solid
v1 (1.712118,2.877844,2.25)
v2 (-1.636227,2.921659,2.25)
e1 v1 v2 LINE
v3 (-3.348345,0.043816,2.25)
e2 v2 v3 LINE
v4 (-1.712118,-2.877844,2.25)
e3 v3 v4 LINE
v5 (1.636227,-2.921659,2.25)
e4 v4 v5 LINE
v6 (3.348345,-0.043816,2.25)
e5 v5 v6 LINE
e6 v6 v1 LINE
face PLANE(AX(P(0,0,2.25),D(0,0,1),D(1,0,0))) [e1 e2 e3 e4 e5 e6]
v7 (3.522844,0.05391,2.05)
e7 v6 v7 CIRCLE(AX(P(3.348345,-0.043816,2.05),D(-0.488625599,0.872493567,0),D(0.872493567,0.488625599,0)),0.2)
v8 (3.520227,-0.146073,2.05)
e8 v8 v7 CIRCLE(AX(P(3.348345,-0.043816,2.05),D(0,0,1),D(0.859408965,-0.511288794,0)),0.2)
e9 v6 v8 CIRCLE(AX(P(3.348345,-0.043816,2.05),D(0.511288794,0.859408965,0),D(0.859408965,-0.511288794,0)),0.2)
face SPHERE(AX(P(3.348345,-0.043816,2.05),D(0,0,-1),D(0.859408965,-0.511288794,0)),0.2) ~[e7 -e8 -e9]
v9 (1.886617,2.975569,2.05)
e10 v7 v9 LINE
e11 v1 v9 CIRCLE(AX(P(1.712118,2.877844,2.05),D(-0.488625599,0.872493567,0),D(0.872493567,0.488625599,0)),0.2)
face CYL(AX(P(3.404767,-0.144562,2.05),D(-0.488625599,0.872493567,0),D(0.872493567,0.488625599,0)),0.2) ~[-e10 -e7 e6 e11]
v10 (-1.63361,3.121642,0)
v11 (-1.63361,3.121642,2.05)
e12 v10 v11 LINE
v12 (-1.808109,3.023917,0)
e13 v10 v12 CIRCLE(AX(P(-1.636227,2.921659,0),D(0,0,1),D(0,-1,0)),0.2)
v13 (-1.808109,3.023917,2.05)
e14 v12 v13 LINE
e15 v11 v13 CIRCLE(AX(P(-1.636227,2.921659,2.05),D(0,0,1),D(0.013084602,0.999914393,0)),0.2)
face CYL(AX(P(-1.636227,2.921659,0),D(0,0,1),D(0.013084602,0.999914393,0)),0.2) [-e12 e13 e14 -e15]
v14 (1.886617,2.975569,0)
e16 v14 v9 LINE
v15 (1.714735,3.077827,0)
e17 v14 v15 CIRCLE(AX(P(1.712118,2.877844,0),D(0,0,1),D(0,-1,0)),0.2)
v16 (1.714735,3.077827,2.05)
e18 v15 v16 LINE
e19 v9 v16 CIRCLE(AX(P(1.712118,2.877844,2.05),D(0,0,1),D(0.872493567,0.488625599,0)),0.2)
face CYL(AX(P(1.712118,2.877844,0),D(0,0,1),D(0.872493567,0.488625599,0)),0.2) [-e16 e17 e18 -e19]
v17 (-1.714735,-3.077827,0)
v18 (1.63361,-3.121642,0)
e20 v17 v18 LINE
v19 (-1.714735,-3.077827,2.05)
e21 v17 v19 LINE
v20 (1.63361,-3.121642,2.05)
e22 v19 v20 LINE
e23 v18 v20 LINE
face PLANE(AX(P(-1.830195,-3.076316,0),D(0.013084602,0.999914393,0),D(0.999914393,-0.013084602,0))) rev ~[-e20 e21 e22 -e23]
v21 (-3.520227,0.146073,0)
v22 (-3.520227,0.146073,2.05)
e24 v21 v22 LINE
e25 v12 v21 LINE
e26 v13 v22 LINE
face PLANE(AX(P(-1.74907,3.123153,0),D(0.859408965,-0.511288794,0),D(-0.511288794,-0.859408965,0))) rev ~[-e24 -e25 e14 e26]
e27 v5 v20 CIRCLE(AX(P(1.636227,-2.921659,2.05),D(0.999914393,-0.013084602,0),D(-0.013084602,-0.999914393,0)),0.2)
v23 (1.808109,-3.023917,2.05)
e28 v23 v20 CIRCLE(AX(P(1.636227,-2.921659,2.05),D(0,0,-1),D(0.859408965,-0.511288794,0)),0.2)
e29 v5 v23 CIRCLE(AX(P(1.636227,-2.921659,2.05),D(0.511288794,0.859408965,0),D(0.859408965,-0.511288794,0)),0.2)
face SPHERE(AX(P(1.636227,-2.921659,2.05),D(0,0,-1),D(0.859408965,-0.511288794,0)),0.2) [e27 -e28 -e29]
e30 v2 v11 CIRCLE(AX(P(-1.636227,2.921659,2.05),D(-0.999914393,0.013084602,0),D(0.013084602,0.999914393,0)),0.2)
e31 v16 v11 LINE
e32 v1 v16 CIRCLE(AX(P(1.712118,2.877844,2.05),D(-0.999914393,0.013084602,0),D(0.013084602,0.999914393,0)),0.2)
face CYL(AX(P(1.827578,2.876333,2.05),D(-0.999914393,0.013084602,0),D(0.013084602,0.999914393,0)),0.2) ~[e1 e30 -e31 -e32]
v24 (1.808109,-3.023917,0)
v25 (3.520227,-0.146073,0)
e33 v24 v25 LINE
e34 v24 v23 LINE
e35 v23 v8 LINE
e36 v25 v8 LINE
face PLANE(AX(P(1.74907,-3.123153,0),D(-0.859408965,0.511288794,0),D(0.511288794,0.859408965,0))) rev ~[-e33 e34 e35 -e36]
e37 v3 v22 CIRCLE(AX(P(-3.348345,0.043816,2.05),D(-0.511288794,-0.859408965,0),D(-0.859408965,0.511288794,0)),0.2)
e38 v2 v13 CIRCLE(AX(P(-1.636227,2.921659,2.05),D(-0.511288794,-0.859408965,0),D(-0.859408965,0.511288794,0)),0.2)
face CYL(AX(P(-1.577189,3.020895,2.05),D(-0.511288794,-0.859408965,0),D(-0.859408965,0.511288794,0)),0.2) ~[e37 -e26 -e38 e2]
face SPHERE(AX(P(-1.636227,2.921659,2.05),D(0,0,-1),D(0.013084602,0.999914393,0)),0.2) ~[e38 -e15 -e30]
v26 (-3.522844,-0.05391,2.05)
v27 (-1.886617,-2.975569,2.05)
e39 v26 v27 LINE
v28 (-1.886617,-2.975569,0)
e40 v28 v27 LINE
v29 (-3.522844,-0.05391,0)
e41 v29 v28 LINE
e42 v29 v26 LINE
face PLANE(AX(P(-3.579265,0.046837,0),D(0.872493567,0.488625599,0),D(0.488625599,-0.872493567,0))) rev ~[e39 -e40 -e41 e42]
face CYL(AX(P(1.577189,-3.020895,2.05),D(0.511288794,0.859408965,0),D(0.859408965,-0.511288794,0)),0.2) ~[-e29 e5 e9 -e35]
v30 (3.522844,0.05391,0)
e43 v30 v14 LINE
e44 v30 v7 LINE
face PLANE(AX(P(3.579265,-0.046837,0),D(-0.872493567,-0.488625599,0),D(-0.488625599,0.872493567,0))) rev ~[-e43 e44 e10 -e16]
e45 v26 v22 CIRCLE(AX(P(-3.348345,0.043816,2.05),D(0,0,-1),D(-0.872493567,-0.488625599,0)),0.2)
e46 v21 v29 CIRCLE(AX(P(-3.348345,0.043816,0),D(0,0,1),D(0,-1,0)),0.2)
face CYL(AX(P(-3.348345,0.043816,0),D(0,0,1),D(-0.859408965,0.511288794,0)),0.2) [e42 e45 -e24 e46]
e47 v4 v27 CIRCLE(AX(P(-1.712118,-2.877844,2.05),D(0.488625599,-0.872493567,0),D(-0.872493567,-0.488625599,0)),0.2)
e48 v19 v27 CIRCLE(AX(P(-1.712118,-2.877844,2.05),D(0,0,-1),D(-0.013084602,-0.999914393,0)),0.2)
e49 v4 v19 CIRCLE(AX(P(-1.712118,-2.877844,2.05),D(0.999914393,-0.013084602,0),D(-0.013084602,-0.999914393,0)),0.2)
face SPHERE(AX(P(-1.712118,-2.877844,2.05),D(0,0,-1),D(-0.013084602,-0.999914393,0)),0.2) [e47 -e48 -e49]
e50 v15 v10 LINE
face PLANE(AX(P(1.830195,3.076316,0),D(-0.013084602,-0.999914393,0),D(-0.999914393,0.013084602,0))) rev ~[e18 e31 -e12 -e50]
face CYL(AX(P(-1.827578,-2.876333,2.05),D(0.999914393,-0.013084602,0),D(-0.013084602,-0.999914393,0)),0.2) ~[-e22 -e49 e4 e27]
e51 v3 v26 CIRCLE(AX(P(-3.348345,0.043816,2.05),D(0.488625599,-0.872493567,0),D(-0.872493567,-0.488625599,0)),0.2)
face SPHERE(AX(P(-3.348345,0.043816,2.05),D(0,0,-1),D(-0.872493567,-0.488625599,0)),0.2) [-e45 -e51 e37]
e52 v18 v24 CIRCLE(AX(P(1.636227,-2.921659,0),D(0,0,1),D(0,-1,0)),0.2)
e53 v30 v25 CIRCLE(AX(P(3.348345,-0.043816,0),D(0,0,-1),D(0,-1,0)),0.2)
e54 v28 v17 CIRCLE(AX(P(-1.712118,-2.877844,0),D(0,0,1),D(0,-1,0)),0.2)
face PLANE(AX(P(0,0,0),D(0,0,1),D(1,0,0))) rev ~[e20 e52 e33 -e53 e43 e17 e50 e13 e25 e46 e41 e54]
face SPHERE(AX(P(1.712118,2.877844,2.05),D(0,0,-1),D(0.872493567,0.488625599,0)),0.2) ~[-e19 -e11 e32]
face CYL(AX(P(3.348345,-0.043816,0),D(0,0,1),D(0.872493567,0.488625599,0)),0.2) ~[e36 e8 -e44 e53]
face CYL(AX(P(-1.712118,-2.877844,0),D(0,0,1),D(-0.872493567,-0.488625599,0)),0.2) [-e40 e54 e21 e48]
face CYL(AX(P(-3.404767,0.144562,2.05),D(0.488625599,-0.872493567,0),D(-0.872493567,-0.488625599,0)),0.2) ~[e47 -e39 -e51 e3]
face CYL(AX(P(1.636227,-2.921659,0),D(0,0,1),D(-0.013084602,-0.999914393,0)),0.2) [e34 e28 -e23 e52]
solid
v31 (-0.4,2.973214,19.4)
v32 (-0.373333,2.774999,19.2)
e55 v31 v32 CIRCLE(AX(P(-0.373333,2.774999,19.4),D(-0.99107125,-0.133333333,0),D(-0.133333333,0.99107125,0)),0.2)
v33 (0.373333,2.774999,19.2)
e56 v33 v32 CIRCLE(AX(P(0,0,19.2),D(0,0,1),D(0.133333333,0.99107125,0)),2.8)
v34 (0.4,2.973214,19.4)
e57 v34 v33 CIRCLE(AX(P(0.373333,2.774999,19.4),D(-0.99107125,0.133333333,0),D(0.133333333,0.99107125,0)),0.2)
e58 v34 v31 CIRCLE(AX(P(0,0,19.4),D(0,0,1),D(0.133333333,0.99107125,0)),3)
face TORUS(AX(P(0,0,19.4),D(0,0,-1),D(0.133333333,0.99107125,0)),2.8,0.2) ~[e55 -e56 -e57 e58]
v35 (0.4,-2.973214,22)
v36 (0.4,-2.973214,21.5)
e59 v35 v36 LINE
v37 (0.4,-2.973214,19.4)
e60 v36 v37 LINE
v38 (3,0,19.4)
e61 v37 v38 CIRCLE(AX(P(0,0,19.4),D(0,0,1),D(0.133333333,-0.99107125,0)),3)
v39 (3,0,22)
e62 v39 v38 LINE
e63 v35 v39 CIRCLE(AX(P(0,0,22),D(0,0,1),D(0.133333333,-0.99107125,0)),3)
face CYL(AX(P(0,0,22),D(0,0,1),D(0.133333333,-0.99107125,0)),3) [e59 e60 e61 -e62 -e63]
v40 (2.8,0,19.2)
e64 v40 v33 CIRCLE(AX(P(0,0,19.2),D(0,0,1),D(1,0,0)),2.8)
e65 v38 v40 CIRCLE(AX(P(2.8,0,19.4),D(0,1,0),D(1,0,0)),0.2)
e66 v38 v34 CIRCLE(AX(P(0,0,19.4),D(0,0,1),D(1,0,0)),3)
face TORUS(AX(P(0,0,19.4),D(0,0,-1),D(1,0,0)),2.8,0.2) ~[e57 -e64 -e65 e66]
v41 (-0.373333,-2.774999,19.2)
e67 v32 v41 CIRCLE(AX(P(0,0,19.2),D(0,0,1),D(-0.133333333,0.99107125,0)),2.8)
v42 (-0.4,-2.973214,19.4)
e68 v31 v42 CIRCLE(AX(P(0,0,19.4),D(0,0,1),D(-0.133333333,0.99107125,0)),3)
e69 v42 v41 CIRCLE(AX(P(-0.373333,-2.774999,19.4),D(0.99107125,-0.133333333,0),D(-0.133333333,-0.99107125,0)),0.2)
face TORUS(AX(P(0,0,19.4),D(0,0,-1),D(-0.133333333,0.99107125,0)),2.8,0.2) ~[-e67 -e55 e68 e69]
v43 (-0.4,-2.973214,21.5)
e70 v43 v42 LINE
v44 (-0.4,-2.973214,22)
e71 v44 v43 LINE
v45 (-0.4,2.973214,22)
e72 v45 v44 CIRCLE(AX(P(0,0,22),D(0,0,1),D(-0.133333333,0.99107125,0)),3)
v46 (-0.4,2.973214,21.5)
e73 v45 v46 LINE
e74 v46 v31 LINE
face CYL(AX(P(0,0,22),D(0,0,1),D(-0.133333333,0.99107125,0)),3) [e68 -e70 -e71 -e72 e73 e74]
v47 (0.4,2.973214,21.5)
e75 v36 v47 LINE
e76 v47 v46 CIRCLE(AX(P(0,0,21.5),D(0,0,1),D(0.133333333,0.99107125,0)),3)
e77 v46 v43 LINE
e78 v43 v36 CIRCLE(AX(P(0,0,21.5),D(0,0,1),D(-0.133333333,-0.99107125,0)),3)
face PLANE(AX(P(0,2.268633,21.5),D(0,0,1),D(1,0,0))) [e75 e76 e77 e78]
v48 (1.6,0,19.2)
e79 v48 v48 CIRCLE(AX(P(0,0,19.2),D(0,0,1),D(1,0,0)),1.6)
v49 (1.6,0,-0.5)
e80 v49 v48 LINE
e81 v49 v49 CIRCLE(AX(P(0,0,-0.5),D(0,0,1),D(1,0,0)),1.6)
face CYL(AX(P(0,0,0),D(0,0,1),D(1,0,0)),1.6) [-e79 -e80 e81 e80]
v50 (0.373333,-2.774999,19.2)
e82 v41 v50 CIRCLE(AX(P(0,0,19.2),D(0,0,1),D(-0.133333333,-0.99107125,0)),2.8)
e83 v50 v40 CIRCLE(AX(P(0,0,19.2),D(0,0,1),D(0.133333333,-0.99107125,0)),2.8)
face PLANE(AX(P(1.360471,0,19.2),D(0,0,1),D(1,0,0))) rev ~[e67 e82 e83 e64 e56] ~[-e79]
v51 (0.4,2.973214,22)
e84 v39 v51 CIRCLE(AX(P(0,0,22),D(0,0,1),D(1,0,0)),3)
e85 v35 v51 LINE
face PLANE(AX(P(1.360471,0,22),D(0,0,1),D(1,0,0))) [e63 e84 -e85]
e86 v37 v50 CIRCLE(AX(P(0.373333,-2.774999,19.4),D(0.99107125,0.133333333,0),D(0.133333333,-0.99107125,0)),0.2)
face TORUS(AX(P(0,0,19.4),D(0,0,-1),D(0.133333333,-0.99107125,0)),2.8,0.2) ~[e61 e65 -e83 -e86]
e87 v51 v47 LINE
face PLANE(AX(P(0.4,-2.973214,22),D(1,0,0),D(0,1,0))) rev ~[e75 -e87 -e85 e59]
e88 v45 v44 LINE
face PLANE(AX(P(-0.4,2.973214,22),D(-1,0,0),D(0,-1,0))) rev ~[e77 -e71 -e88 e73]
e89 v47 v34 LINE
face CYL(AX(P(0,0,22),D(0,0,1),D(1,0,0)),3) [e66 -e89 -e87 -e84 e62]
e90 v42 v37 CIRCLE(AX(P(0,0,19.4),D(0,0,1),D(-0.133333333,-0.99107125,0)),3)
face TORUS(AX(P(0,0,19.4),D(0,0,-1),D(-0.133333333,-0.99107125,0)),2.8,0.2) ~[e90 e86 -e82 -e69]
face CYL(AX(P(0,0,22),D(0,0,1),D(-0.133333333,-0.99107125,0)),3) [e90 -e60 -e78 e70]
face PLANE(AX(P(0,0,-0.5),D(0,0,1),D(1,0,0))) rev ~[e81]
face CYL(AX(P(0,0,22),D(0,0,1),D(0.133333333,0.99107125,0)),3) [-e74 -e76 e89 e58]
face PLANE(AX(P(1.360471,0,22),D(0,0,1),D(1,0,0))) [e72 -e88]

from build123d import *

# Parameters (mm, degrees)
F1_DEPTH      = 2.25
F2_R          = 1.6
F3_DEPTH      = 22
F3_DEPTH_BACK = 0.5
F5_DEPTH      = 2.8
F6_R          = 0.2
F6_2_R        = 0.2
F7_DEPTH      = 0.5


# Not quite as in the source:
# - a feature names something its author has since deleted; it is built from what else it names


with BuildPart() as f1:
    # F0 (on Top) → F1 (new body)
    with BuildSketch(Plane.XY):
        Polygon((3.5792652324, -0.0468372692), (1.8301948812, 3.0763159835), (-1.7490703512, 3.1231532527), (-3.5792652324, 0.0468372692), (-1.8301948812, -3.0763159835), (1.7490703512, -3.1231532527), align=None)
    extrude(amount=F1_DEPTH)

    # F6#2
    f6_2_edges = [f1.edges().sort_by_distance(p)[0] for p in [
        (2.664168, -1.584995, 2.25),
        (2.70473, 1.514739, 2.25),
        (-0.040562, -3.099735, 2.25),
        (-2.70473, -1.514739, 2.25),
        (0.040562, 3.099735, 2.25),
        (-2.664168, 1.584995, 2.25),
        (-1.830195, -3.076316, 1.125),
        (1.74907, -3.123153, 1.125),
        (3.579265, -0.046837, 1.125),
        (-3.579265, 0.046837, 1.125),
        (1.830195, 3.076316, 1.125),
        (-1.74907, 3.123153, 1.125),
    ]]
    fillet(f6_2_edges, radius=F6_2_R)


with BuildPart() as f3:
    # F2 (on Top) → F3 (new body, two sides)
    with BuildSketch(Plane.XY) as f3_sk:
        Circle(F2_R)
    extrude(amount=F3_DEPTH)
    extrude(f3_sk.sketch, amount=-F3_DEPTH_BACK)

    # F4 (on face) → F5 (join)
    with BuildSketch(Plane.XY.offset(22)):
        with BuildLine():
            ThreePointArc((0.4, -2.9732137495), (2.2583179581, -1.9748417658), (3, 0))
            ThreePointArc((3, 0), (2.2583179581, 1.9748417658), (0.4, 2.9732137495))
            Line((0.4, 2.9732137495), (0.4, -2.9732137495))
        make_face()
        with BuildLine():
            Line((0.4, -2.9732137495), (0.4, 2.9732137495))
            ThreePointArc((0.4, 2.9732137495), (0, 3), (-0.4, 2.9732137495))
            Line((-0.4, 2.9732137495), (-0.4, -2.9732137495))
            ThreePointArc((-0.4, -2.9732137495), (0, -3), (0.4, -2.9732137495))
        make_face()
        with BuildLine():
            Line((-0.4, -2.9732137495), (-0.4, 2.9732137495))
            ThreePointArc((-0.4, 2.9732137495), (-3, 0), (-0.4, -2.9732137495))
        make_face()
    extrude(amount=-F5_DEPTH)

    # F6
    f6_edges = [f3.edges().sort_by_distance(p)[0] for p in [
        (0.4, -2.973214, 19.2),
    ]]
    fillet(f6_edges, radius=F6_R)

    # F4 (on face) → F7 (cut)
    with BuildSketch(Plane.XY.offset(22)):
        with BuildLine():
            Line((0.4, 1.5491933385), (0.4, 2.9732137495))
            ThreePointArc((0.4, 2.9732137495), (0, 3), (-0.4, 2.9732137495))
            Line((-0.4, 2.9732137495), (-0.4, 1.5491933385))
            ThreePointArc((-0.4, 1.5491933385), (0, 1.6), (0.4, 1.5491933385))
        make_face()
        with BuildLine():
            Line((0.4, -1.5491933385), (0.4, 1.5491933385))
            ThreePointArc((0.4, 1.5491933385), (0, 1.6), (-0.4, 1.5491933385))
            Line((-0.4, 1.5491933385), (-0.4, -1.5491933385))
            ThreePointArc((-0.4, -1.5491933385), (0, -1.6), (0.4, -1.5491933385))
        make_face()
        with BuildLine():
            ThreePointArc((-0.4, -2.9732137495), (0, -3), (0.4, -2.9732137495))
            Line((0.4, -2.9732137495), (0.4, -1.5491933385))
            ThreePointArc((0.4, -1.5491933385), (0, -1.6), (-0.4, -1.5491933385))
            Line((-0.4, -1.5491933385), (-0.4, -2.9732137495))
        make_face()
    extrude(amount=-F7_DEPTH, mode=Mode.SUBTRACT)


solid = Compound([f1.part, f3.part])
